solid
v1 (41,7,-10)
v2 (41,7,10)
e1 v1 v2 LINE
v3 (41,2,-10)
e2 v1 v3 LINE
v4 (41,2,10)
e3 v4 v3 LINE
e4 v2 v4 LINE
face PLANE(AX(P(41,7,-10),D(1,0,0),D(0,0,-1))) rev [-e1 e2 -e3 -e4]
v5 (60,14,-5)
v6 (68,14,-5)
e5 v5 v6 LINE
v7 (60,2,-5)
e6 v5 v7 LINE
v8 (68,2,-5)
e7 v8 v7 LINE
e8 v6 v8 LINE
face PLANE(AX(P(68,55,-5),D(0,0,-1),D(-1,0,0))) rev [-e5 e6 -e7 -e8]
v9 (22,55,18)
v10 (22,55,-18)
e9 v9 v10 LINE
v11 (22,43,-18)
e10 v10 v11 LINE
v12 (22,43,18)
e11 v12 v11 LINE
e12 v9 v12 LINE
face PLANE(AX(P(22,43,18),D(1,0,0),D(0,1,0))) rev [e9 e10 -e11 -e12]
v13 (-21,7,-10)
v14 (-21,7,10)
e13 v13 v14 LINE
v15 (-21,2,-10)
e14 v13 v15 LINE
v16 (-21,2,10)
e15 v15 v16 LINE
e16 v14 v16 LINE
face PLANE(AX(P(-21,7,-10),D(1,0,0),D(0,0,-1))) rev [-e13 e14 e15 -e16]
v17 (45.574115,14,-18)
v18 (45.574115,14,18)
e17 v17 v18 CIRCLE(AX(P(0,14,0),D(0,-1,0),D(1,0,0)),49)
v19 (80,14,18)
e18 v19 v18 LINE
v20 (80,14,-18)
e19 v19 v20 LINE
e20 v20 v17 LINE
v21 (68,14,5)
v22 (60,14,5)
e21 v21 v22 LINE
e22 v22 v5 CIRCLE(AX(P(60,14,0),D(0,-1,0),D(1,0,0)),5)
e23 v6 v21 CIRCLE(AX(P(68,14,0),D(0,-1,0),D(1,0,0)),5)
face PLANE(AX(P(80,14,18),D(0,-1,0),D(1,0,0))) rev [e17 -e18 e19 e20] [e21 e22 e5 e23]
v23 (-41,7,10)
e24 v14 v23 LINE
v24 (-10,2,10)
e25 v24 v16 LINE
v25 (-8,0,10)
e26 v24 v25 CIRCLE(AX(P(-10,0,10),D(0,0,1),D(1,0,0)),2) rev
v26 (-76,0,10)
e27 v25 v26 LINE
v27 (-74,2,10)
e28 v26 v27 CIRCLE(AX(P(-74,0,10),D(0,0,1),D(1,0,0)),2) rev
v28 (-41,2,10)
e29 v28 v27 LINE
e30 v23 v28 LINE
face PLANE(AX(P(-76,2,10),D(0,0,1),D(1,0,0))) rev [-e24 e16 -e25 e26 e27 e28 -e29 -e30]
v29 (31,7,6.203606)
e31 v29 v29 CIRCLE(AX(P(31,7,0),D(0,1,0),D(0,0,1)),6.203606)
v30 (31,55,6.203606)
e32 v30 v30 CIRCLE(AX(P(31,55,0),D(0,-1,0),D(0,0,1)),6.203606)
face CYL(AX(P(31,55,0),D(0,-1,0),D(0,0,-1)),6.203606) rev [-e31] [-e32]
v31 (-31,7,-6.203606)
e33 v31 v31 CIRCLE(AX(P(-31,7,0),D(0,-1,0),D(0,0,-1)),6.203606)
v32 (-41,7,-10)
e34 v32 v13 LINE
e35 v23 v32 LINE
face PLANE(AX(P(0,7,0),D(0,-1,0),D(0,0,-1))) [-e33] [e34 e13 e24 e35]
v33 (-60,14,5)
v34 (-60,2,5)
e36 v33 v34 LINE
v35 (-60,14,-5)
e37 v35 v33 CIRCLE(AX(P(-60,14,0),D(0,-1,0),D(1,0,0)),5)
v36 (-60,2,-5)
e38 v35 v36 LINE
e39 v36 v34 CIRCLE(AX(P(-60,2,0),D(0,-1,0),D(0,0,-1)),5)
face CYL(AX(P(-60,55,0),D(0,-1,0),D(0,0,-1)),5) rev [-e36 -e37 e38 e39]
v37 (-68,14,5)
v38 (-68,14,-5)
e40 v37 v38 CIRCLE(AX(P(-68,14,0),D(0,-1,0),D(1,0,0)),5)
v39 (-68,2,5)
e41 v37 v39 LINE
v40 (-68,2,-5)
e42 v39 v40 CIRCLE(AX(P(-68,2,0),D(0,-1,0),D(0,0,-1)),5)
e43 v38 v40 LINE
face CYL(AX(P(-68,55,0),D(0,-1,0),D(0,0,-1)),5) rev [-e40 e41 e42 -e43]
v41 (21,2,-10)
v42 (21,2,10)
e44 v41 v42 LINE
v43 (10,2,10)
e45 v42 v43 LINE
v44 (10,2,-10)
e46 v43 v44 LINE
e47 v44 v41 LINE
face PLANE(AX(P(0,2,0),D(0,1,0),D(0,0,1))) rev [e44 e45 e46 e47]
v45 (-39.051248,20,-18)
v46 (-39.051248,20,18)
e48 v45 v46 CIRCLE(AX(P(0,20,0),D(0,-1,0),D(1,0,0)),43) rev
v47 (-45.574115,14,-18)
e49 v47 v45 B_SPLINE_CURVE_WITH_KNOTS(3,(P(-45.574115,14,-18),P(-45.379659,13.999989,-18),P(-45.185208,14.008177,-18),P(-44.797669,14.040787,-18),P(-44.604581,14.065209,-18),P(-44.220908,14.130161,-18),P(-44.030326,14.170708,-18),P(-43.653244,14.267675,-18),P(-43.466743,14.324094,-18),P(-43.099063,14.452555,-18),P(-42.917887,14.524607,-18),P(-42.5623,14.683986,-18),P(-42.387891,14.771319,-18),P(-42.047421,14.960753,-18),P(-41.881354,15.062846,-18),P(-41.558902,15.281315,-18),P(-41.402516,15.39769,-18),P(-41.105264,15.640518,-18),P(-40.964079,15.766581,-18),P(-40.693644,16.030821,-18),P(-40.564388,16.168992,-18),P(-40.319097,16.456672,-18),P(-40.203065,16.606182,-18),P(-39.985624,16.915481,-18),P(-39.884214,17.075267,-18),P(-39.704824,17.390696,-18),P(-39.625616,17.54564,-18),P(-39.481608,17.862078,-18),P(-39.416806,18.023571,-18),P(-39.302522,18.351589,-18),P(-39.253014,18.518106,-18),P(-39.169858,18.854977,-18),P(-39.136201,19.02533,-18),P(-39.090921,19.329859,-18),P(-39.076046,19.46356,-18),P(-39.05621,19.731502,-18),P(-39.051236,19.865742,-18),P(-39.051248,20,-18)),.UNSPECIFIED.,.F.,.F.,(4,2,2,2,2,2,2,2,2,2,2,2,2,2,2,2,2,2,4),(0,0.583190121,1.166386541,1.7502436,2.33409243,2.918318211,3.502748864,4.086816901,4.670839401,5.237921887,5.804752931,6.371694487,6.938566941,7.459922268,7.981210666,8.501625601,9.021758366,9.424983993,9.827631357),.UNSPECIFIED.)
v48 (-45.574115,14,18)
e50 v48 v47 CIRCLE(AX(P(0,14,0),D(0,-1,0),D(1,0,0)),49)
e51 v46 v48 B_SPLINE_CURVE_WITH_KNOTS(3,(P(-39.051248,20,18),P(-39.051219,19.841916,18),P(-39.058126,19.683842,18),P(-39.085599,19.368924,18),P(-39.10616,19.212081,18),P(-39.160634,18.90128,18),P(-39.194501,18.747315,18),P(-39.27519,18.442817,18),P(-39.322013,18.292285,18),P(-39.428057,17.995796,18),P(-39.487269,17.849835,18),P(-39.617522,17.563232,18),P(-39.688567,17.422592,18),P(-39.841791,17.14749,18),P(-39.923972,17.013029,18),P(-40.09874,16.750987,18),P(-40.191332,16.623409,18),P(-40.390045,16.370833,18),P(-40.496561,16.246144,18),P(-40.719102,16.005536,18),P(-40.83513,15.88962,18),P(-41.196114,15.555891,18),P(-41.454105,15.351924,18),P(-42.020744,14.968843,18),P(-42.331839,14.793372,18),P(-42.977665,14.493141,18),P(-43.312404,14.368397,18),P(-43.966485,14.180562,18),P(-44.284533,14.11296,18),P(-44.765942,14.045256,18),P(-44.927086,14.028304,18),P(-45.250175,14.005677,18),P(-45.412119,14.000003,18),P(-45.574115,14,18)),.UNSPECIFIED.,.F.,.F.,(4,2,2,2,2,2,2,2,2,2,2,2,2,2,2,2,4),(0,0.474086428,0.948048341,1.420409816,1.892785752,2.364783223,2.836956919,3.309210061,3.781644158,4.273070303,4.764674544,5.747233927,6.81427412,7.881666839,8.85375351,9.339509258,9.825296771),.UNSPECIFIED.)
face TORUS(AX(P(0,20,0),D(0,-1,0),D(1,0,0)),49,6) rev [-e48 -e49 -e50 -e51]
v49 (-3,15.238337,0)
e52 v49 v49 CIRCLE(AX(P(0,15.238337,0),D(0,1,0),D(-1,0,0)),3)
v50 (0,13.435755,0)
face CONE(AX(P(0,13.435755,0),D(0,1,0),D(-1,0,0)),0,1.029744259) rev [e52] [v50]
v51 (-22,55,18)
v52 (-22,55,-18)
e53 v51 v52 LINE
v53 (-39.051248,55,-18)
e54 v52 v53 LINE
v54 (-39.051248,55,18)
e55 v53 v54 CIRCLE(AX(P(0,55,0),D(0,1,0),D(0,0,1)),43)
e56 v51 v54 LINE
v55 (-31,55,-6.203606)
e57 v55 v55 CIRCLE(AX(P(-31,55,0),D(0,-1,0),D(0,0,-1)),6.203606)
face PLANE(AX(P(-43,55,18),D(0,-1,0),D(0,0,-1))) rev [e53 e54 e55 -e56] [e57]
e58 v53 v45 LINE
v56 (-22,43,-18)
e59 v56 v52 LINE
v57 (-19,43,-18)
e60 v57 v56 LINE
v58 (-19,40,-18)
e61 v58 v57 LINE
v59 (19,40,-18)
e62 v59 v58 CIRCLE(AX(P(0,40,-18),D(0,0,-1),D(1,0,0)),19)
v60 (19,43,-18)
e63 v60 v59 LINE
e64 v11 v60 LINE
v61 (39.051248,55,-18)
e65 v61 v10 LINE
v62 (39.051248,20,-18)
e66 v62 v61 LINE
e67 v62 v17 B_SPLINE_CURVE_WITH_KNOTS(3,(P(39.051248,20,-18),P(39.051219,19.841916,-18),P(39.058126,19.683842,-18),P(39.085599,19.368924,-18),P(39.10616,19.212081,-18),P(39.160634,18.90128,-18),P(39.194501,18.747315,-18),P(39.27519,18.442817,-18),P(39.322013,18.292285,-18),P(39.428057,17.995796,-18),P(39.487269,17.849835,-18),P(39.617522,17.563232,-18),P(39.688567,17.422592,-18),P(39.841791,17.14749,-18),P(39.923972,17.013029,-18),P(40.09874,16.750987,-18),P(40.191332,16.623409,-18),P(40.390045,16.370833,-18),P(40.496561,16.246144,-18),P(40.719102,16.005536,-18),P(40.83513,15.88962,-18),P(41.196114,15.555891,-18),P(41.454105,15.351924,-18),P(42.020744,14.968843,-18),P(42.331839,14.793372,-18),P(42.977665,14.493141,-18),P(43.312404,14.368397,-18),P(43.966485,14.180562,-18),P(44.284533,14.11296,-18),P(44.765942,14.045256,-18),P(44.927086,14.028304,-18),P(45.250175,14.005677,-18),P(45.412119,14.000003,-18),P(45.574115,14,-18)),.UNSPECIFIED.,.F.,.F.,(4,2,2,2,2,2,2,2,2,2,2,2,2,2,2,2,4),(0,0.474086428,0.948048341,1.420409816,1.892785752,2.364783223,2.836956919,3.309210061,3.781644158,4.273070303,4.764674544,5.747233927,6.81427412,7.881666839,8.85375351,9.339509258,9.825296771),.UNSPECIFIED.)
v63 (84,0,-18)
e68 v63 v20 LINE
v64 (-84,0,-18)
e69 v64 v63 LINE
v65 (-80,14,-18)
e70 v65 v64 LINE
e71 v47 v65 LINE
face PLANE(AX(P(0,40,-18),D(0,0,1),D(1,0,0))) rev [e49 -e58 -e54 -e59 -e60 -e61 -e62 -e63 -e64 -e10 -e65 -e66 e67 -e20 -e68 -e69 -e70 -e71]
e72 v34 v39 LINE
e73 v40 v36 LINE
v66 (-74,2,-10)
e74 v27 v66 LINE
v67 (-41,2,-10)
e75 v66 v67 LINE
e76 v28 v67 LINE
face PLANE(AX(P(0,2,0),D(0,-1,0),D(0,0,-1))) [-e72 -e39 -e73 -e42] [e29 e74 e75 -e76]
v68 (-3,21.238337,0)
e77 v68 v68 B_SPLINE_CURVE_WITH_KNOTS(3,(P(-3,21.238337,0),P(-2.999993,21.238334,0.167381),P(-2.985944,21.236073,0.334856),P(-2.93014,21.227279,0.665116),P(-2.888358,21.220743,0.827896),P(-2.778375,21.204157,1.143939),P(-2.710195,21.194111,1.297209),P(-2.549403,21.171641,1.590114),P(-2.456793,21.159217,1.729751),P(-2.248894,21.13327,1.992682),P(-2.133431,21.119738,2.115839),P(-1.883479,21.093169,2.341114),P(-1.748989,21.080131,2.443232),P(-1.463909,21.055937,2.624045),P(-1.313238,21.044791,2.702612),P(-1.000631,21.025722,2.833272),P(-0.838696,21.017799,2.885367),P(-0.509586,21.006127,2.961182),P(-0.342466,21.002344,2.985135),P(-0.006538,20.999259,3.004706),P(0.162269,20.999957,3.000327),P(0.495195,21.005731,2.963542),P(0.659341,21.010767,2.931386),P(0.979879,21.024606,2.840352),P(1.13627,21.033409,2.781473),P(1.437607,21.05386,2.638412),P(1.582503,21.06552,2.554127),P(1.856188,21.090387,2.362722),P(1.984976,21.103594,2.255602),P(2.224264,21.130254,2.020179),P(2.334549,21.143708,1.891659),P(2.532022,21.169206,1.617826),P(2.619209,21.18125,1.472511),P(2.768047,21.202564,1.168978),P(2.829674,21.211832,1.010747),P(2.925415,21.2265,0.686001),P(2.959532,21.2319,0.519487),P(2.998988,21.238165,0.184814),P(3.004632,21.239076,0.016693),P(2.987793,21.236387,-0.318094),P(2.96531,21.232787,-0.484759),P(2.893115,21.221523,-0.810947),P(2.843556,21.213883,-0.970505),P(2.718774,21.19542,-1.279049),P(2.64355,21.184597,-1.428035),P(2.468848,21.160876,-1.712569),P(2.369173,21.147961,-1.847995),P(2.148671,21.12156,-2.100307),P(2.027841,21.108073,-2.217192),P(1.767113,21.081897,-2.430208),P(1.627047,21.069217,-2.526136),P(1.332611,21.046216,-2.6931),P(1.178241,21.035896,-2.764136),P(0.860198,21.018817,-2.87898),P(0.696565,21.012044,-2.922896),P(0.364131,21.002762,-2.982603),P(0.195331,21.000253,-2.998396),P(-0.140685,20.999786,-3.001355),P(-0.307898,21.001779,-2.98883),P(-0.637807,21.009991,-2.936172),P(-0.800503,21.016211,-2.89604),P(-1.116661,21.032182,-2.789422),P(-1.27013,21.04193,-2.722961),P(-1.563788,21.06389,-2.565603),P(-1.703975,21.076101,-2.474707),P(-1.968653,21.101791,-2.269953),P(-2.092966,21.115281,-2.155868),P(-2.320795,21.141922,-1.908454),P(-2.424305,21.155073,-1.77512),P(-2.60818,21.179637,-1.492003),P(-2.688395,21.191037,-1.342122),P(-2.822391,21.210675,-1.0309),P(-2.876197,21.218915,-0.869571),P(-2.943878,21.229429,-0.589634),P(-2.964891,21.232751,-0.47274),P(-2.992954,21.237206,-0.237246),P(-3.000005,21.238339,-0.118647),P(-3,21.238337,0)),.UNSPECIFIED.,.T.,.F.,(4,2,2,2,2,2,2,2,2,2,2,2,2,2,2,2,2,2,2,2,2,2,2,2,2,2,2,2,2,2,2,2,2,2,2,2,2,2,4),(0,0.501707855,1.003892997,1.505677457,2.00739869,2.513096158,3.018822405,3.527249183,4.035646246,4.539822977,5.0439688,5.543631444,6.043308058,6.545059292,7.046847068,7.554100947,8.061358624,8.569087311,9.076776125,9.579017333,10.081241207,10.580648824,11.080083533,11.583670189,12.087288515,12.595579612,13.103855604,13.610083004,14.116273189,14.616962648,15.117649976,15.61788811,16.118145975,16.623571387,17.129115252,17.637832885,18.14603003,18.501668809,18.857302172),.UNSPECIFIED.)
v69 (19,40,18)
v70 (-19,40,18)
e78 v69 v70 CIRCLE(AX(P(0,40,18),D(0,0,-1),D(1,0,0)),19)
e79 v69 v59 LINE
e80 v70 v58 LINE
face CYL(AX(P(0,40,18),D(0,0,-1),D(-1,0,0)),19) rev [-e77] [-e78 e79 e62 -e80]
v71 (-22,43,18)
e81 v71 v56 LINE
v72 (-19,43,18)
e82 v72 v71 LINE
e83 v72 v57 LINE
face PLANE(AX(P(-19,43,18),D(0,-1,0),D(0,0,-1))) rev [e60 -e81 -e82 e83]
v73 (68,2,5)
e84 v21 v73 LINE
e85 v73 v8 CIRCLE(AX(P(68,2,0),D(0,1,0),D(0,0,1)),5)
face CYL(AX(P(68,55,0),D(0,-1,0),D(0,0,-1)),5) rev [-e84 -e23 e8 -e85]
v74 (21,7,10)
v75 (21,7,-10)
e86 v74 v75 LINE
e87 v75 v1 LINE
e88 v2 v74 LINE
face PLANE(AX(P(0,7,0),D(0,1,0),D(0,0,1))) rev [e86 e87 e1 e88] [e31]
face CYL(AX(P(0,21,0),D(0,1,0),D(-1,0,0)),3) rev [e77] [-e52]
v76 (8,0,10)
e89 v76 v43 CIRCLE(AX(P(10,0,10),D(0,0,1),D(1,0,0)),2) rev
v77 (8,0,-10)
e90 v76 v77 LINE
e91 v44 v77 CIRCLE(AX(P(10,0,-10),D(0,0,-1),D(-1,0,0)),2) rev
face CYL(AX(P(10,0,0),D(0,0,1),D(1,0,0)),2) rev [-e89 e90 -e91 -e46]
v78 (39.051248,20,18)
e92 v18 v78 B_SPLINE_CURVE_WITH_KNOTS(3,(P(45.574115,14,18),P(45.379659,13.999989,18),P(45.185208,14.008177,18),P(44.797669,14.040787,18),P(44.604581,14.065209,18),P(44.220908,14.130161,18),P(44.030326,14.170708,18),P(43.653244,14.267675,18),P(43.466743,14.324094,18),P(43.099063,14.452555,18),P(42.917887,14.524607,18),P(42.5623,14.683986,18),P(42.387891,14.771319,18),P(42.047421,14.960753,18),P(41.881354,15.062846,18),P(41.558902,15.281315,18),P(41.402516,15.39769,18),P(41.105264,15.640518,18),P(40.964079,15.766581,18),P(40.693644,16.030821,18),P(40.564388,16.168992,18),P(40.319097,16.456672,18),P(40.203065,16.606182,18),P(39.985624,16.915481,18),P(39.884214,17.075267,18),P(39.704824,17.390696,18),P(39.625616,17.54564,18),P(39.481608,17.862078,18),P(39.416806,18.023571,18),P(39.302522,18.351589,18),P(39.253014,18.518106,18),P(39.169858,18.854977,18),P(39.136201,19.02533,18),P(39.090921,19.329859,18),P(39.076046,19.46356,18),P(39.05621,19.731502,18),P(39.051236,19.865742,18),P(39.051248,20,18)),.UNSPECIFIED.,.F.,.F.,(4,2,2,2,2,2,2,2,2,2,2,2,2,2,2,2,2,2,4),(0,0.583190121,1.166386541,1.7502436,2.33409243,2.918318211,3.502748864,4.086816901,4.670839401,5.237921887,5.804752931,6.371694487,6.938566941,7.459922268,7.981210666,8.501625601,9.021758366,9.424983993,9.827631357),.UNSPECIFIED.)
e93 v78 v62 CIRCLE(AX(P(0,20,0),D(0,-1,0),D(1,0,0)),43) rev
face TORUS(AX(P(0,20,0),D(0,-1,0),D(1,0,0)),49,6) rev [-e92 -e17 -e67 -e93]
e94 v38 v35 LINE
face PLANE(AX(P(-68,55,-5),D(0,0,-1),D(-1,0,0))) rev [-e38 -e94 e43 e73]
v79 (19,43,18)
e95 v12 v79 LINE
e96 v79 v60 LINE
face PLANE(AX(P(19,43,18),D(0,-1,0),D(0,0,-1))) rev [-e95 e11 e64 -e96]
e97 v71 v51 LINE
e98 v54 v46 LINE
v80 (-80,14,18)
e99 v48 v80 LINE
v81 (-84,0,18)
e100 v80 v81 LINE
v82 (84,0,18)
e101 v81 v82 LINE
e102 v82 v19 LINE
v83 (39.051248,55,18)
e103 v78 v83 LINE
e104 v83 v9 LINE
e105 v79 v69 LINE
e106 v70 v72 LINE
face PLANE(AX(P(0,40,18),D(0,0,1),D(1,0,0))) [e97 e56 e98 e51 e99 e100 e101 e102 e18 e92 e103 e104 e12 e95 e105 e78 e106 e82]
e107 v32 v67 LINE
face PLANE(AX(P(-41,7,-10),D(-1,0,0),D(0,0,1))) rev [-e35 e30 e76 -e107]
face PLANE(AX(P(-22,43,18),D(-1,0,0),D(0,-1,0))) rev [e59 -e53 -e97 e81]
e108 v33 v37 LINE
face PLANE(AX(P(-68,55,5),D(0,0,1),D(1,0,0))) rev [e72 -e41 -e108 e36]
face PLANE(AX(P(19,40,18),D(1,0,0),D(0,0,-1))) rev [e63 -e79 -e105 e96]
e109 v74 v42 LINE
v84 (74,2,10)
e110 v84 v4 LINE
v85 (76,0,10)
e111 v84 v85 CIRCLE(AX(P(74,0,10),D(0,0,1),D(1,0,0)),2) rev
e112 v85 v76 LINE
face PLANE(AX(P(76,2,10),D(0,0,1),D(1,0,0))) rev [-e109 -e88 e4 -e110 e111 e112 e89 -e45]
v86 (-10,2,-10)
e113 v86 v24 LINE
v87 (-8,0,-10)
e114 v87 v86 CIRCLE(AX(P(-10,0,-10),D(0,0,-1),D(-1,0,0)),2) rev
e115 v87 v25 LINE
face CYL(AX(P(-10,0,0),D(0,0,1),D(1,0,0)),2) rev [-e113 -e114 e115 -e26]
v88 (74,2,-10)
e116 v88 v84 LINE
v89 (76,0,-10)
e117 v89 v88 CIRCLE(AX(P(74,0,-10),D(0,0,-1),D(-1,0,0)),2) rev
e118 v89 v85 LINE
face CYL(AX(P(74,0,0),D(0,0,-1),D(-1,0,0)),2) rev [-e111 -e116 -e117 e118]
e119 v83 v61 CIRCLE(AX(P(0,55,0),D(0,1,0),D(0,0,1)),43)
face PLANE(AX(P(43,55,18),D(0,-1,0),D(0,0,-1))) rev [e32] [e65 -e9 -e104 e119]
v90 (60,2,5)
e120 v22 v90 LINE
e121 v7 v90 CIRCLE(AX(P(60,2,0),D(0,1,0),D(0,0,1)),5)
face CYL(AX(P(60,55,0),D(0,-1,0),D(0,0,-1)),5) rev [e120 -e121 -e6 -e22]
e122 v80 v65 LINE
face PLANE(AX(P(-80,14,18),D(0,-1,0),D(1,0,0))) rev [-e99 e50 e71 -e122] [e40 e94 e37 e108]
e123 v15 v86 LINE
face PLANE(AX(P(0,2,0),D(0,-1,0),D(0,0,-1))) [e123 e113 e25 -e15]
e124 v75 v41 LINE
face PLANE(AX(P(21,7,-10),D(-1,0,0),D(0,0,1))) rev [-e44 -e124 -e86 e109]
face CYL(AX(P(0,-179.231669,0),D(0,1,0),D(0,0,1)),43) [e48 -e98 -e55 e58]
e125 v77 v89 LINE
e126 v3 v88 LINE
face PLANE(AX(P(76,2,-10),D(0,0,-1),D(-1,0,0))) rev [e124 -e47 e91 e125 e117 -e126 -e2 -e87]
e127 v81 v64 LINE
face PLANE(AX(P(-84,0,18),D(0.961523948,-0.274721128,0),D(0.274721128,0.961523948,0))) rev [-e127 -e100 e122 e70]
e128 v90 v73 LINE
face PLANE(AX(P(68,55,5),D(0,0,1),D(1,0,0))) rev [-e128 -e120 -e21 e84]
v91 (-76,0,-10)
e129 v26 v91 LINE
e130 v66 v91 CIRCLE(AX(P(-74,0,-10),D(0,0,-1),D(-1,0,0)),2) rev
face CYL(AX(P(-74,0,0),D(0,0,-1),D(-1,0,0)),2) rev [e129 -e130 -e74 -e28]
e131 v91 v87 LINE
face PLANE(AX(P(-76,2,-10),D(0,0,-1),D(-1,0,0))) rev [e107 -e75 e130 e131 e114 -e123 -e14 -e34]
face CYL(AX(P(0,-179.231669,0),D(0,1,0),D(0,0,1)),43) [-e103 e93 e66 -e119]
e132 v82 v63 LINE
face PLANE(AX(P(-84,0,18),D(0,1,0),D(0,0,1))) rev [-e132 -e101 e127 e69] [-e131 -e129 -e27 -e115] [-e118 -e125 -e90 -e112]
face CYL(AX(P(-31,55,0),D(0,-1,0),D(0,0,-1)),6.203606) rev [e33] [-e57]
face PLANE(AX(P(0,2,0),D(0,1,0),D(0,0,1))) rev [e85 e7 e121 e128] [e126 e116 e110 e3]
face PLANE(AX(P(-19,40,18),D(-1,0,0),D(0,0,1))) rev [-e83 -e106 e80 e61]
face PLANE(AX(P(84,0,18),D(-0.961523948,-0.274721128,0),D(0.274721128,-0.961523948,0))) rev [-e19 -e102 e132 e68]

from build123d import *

# Parameters (mm, degrees)
BOSS_EXTRUDE1_DEPTH = 18
SKETCH2_W           = 68
SKETCH2_H           = 20
CUT_EXTRUDE1_DEPTH  = 2
FILLET1_R           = 2
SKETCH3_W           = 20
SKETCH3_H           = 20
CUT_EXTRUDE4_DEPTH  = 7
SKETCH6_R           = 6.203606153
CUT_EXTRUDE5_DEPTH  = 103.004901843
CUT_EXTRUDE6_START  = -41
CUT_EXTRUDE6_DEPTH  = 41
FILLET2_R           = 6


# Read off the part's stored shape, not the designer's step: Cut-Extrude6
with BuildPart() as part:
    # Sketch1 → Boss-Extrude1 (new, symmetric)
    with BuildSketch(Plane.XY):
        with BuildLine():
            Line((-84, 0), (84, 0))
            Line((84, 0), (80, 14))
            Line((80, 14), (43, 14))
            Line((43, 14), (43, 55))
            Line((43, 55), (22, 55))
            Line((22, 55), (22, 43))
            Line((22, 43), (19, 43))
            Line((19, 43), (19, 40))
            ThreePointArc((19, 40), (0, 21), (-19, 40))
            Line((-19, 40), (-19, 43))
            Line((-19, 43), (-22, 43))
            Line((-22, 43), (-22, 55))
            Line((-22, 55), (-43, 55))
            Line((-43, 55), (-43, 14))
            Line((-43, 14), (-80, 14))
            Line((-80, 14), (-84, 0))
        make_face()
    extrude(amount=BOSS_EXTRUDE1_DEPTH, both=True)

    # Sketch2 → Cut-Extrude1 (cut)
    with BuildSketch(Plane.XZ):
        with Locations((-42, 0)):
            Rectangle(SKETCH2_W, SKETCH2_H)
        with Locations((42, 0)):
            Rectangle(SKETCH2_W, SKETCH2_H)
    extrude(amount=-CUT_EXTRUDE1_DEPTH, mode=Mode.SUBTRACT)

    # Fillet1
    fillet1_edges = [part.edges().sort_by_distance(p)[0] for p in [
        (76, 2, 0),
        (8, 2, 0),
        (-8, 2, 0),
        (-76, 2, 0),
    ]]
    fillet(fillet1_edges, radius=FILLET1_R - 0.0001)  # a hair under: the kernel refuses the full size

    # Sketch3 → Cut-Extrude4 (cut)
    with BuildSketch(Plane.XZ):
        with Locations((-31, 0)):
            Rectangle(SKETCH3_W, SKETCH3_H)
        with Locations((31, 0)):
            Rectangle(SKETCH3_W, SKETCH3_H)
    extrude(amount=-CUT_EXTRUDE4_DEPTH, mode=Mode.SUBTRACT)

    # Sketch6 → Cut-Extrude5 (cut, through all)
    with BuildSketch(Plane.XZ):
        with Locations(Location((-31, 0, 0), (0, 0, 270))):
            Circle(SKETCH6_R)
        with Locations(Location((31, 0, 0), (0, 0, 90))):
            Circle(SKETCH6_R)
        with BuildLine():
            Line((-68, 5), (-60, 5))
            ThreePointArc((-60, 5), (-55, 0), (-60, -5))
            Line((-60, -5), (-68, -5))
            ThreePointArc((-68, -5), (-73, 0), (-68, 5))
        make_face()
        with BuildLine():
            Line((68, 5), (60, 5))
            ThreePointArc((60, 5), (55, 0), (60, -5))
            Line((60, -5), (68, -5))
            ThreePointArc((68, -5), (73, 0), (68, 5))
        make_face()
    extrude(amount=-CUT_EXTRUDE5_DEPTH, mode=Mode.SUBTRACT)

    # Cut-Extrude6 outline → Cut-Extrude6 (cut)
    with BuildSketch(Plane(origin=(0, 55, 0), x_dir=(1, 0, 0), z_dir=(0, 1, 0)).offset(CUT_EXTRUDE6_START)):
        with BuildLine():
            ThreePointArc((43, 0), (42.001212365, -9.214019744), (39.05124838, -18))
            Line((39.05124838, -18), (43, -18))
            Line((43, -18), (43, 0))
        make_face()
        with BuildLine():
            ThreePointArc((39.05124838, 18), (42.001212365, 9.214019744), (43, 0))
            Line((43, 0), (43, 18))
            Line((43, 18), (39.05124838, 18))
        make_face()
        with BuildLine():
            Line((-43, -18), (-39.05124838, -18))
            ThreePointArc((-39.05124838, -18), (-42.001212365, -9.214019744), (-43, 0))
            Line((-43, 0), (-43, -18))
        make_face()
        with BuildLine():
            Line((-43, 18), (-43, 0))
            ThreePointArc((-43, 0), (-42.001212365, 9.214019744), (-39.05124838, 18))
            Line((-39.05124838, 18), (-43, 18))
        make_face()
    extrude(amount=CUT_EXTRUDE6_DEPTH, mode=Mode.SUBTRACT)

    # Fillet2
    fillet2_edges = [part.edges().sort_by_distance(p)[0] for p in [
        (42.001212365, 14, -9.214019744),
        (-42.001212365, 14, 9.214019744),
    ]]
    fillet(fillet2_edges, radius=FILLET2_R)

    # Sketch8 → Cut-Revolve1 (revolve, cut)
    with BuildSketch(Plane.XY, mode=Mode.PRIVATE) as cut_revolve1_sk:
        Polygon((0, 21), (0, 13.435755104), (3, 15.238336961), (3, 21.238336961), align=None)
    revolve(cut_revolve1_sk.sketch.rotate(Axis((0, 21, 0), (0, -1, 0)), 180), axis=Axis((0, 21, 0), (0, -1, 0)), mode=Mode.SUBTRACT)


solid = part.part
